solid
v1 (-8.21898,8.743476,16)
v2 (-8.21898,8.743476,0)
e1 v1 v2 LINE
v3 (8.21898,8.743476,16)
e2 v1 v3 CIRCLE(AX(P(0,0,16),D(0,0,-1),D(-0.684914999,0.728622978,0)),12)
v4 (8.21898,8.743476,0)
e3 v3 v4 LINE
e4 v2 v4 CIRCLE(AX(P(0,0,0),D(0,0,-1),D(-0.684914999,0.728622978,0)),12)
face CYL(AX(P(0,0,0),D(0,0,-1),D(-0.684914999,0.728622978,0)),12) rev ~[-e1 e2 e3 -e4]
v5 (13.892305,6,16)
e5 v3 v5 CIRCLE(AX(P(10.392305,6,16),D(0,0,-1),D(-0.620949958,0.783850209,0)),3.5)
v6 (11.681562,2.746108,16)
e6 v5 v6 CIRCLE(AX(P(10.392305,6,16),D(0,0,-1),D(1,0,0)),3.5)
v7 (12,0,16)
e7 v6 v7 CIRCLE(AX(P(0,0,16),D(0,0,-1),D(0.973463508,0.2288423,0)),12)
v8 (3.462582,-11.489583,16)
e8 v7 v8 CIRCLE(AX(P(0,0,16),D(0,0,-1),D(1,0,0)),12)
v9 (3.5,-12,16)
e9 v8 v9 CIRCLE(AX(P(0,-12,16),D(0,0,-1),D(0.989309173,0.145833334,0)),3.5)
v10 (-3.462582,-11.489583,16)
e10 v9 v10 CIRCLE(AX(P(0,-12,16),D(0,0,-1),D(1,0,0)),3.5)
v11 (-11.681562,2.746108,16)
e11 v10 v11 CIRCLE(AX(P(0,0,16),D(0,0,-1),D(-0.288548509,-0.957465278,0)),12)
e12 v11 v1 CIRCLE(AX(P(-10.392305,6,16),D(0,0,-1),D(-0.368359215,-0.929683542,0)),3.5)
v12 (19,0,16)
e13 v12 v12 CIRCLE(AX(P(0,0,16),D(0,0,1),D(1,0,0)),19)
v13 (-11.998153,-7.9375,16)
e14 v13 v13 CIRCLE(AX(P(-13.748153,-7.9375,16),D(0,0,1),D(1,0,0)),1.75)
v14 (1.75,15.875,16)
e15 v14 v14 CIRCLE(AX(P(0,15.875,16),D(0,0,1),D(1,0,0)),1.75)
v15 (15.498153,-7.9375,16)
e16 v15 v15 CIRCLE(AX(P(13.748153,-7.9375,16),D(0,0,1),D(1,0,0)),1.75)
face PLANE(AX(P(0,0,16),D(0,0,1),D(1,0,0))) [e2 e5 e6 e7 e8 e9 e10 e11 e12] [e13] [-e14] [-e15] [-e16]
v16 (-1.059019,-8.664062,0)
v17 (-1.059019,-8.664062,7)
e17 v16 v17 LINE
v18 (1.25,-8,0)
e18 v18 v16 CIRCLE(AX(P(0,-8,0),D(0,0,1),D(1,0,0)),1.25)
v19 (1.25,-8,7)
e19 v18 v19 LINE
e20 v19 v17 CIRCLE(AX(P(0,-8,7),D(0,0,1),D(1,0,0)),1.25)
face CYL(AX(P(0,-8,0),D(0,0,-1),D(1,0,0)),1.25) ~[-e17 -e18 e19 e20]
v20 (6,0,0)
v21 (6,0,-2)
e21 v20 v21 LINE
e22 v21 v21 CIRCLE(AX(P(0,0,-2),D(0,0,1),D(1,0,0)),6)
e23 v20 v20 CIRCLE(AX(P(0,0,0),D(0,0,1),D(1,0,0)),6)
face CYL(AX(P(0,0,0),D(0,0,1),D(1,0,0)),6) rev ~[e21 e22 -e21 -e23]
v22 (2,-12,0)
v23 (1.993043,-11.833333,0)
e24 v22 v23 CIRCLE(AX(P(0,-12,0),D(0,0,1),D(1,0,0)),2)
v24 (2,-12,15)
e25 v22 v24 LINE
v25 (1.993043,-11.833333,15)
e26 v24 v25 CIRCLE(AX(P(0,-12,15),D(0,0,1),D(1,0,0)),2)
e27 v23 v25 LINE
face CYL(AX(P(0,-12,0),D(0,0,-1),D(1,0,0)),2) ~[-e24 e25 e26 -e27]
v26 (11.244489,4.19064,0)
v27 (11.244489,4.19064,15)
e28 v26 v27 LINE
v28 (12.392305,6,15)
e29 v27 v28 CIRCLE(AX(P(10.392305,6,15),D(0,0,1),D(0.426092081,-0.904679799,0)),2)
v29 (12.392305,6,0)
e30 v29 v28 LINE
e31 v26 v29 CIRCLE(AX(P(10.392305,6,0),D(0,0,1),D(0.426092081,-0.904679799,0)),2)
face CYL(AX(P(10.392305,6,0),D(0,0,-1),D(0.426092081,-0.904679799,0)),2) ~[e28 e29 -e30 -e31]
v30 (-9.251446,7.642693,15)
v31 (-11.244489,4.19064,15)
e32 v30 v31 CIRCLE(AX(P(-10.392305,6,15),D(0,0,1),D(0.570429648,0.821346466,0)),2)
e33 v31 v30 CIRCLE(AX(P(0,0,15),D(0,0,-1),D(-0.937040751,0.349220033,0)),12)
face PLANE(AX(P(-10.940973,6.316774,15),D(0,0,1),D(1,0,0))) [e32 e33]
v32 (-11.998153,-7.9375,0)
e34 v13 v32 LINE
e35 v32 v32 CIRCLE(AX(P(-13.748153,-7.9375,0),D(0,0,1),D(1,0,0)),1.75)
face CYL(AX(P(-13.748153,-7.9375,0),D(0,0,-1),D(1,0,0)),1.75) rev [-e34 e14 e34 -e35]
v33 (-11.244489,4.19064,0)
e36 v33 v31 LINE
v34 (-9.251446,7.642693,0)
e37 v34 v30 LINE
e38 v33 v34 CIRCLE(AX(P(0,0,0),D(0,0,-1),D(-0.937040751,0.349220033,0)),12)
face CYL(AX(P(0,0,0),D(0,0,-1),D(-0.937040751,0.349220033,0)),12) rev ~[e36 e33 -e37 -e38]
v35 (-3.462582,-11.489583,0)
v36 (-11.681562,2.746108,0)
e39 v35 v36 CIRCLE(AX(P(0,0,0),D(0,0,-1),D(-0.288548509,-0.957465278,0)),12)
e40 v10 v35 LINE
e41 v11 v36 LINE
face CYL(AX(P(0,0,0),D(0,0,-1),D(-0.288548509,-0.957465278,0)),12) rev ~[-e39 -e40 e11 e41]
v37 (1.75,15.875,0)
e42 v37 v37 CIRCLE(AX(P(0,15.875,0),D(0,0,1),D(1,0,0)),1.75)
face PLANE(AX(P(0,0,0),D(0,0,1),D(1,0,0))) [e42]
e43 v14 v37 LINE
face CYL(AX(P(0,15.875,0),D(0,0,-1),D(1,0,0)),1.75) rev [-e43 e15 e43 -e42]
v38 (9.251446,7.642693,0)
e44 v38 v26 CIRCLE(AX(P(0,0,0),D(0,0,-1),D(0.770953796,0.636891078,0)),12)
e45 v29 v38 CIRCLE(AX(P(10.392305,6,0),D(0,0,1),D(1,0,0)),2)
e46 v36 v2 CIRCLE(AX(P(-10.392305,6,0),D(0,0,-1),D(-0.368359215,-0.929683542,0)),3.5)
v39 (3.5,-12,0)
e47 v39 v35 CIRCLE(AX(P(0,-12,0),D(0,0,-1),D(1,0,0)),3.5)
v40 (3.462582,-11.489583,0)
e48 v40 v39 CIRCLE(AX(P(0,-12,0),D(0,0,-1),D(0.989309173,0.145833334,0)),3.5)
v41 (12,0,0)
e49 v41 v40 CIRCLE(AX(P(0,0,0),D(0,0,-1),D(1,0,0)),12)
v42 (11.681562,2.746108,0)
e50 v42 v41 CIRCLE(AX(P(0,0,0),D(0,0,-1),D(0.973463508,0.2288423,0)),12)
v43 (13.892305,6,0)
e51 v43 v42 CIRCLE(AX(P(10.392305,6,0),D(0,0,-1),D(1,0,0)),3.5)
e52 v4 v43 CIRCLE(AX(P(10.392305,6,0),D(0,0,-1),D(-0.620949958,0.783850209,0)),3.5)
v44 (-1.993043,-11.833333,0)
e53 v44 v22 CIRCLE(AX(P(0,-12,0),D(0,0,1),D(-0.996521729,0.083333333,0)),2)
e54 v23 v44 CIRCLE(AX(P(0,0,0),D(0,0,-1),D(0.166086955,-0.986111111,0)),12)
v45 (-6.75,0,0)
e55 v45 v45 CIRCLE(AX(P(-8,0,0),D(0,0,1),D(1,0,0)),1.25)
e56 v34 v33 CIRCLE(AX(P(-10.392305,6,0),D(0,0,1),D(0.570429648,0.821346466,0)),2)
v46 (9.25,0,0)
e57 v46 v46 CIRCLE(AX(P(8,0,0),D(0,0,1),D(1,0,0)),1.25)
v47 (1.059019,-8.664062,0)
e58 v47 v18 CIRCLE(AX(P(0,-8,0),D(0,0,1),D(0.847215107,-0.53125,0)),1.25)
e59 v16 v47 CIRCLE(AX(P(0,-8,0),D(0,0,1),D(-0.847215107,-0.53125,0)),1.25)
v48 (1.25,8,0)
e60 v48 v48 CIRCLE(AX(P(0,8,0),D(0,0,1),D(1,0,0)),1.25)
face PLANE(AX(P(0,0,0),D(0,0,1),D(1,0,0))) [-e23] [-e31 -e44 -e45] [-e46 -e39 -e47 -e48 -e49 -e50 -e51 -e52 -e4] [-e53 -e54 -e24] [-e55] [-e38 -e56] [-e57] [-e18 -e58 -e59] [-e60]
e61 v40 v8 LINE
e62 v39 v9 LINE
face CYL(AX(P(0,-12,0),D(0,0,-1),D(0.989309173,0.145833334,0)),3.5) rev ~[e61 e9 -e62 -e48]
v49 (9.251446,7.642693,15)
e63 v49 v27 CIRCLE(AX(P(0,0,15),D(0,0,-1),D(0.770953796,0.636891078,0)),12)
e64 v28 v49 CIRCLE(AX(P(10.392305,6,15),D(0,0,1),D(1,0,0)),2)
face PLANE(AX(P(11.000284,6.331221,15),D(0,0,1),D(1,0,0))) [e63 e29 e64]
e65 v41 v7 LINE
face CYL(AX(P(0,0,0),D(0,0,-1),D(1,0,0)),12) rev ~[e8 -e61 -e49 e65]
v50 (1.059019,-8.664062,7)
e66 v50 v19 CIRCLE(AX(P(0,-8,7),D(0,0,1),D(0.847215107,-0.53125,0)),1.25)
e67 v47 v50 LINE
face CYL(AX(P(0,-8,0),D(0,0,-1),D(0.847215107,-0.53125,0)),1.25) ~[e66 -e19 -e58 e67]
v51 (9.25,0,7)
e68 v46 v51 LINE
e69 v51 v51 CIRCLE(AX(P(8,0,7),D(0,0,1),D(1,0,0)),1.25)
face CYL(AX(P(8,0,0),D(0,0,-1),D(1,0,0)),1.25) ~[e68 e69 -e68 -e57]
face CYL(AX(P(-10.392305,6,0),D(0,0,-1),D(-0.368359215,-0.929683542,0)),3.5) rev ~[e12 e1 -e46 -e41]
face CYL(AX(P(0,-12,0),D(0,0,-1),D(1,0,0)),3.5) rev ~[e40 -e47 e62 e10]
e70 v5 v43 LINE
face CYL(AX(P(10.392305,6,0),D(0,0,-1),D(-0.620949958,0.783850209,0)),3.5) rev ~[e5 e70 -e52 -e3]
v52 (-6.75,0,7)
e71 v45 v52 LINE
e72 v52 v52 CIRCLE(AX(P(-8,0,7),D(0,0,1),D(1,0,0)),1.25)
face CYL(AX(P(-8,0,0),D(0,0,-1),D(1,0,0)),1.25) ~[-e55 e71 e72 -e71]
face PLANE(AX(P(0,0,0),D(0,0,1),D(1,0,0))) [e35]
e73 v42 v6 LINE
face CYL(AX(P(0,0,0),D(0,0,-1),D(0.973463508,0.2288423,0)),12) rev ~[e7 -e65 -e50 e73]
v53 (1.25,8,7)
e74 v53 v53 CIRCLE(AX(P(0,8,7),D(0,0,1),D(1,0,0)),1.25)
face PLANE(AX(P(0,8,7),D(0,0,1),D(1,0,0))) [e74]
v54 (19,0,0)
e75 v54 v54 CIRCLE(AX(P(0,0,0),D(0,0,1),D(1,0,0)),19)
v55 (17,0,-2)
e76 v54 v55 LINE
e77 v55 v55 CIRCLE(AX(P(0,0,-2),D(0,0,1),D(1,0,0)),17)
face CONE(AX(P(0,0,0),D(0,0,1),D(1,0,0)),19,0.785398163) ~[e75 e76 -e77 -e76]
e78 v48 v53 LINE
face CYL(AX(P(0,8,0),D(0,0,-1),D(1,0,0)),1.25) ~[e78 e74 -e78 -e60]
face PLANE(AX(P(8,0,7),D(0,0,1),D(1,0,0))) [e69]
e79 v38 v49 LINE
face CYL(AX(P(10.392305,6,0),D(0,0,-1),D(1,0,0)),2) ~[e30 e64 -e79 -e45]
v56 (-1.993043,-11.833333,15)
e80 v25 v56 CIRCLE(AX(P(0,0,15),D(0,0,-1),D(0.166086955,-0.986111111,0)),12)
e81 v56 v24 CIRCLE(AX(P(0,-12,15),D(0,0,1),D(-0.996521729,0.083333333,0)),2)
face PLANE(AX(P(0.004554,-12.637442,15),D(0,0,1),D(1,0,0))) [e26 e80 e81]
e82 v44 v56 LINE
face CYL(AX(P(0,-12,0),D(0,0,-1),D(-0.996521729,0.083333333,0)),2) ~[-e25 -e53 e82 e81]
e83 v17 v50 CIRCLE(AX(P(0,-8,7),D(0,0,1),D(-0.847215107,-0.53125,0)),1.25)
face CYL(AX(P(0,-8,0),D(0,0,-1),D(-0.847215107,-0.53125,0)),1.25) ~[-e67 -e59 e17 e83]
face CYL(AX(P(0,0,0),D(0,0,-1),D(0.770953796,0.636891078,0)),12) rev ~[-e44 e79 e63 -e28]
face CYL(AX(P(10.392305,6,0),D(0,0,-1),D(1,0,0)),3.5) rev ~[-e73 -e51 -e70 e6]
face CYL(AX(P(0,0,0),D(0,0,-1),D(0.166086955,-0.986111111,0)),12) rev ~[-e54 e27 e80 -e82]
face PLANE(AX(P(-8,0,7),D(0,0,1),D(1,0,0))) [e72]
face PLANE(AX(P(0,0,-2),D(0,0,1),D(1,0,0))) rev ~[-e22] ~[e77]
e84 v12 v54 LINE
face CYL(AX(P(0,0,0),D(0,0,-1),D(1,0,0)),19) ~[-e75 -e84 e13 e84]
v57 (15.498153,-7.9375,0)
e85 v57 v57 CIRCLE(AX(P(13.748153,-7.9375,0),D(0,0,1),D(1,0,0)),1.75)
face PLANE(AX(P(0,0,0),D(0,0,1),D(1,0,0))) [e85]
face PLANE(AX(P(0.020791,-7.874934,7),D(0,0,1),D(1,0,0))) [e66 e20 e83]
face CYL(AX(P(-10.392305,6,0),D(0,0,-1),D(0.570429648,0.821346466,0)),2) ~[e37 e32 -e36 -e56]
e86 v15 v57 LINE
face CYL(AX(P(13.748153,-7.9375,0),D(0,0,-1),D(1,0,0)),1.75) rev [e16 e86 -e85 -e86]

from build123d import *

# Parameters (mm, degrees)
F0_R         = 19
F0_R_2       = 1.75
F1_DEPTH     = 16
F0_R_3       = 1.25
F0_R_4       = 6
F1_FACE_R    = 19
F1_FACE_R_2  = 1.75
F1_FACE1_R   = 19
F1_FACE1_R_2 = 1.75
F2_DEPTH     = 2
F3_DEPTH     = 7
F5_DEPTH     = 15


# Not quite as in the source:
# - a fillet or chamfer that OpenCascade refuses, or shapes differently, is made with other operations: its cross-section is extruded or revolved along the edge and cut away or added


with BuildPart() as f1:
    # F0 (on Top) → F1 (new body)
    with BuildSketch(Plane.XY):
        Circle(F0_R)
        with Locations((-13.7481532851, -7.9375)):
            Circle(F0_R_2, mode=Mode.SUBTRACT)
        with BuildLine():
            ThreePointArc((11.6815620975, 2.746107602), (11.9201246883, 1.3822544682), (12, 0))
            ThreePointArc((12, 0), (9.6320035623, -7.1571298281), (3.4625821039, -11.4895833333))
            ThreePointArc((3.4625821039, -11.4895833333), (3.4906329916, -11.7441068228), (3.5, -12))
            ThreePointArc((3.5, -12), (-0.2558931772, -15.4906329916), (-3.4625821039, -11.4895833333))
            ThreePointArc((-3.4625821039, -11.4895833333), (-10.3923048454, -6), (-11.6815620975, 2.746107602))
            ThreePointArc((-11.6815620975, 2.746107602), (-13.4233937587, 7.75), (-8.2189799936, 8.7434757314))
            ThreePointArc((-8.2189799936, 8.7434757314), (0, 12), (8.2189799936, 8.7434757314))
            ThreePointArc((8.2189799936, 8.7434757314), (11.9160113491, 9.1509234346), (13.8923048454, 6))
            ThreePointArc((13.8923048454, 6), (13.2873351028, 4.0330735121), (11.6815620975, 2.746107602))
        make_face(mode=Mode.SUBTRACT)
        with Locations((13.7481532851, -7.9375)):
            Circle(F0_R_2, mode=Mode.SUBTRACT)
        with Locations((0, 15.875)):
            Circle(F0_R_2, mode=Mode.SUBTRACT)
    extrude(amount=F1_DEPTH)

    # F0 (on Top) + F1_face (on face) + F1_face1 (on face) → F2 (join)
    with BuildSketch(Plane.XY):
        Circle(F0_R)
        with Locations((-13.7481532851, -7.9375)):
            Circle(F0_R_2, mode=Mode.SUBTRACT)
        with BuildLine():
            ThreePointArc((11.6815620975, 2.746107602), (11.9201246883, 1.3822544682), (12, 0))
            ThreePointArc((12, 0), (9.6320035623, -7.1571298281), (3.4625821039, -11.4895833333))
            ThreePointArc((3.4625821039, -11.4895833333), (3.4906329916, -11.7441068228), (3.5, -12))
            ThreePointArc((3.5, -12), (-0.2558931772, -15.4906329916), (-3.4625821039, -11.4895833333))
            ThreePointArc((-3.4625821039, -11.4895833333), (-10.3923048454, -6), (-11.6815620975, 2.746107602))
            ThreePointArc((-11.6815620975, 2.746107602), (-13.4233937587, 7.75), (-8.2189799936, 8.7434757314))
            ThreePointArc((-8.2189799936, 8.7434757314), (0, 12), (8.2189799936, 8.7434757314))
            ThreePointArc((8.2189799936, 8.7434757314), (11.9160113491, 9.1509234346), (13.8923048454, 6))
            ThreePointArc((13.8923048454, 6), (13.2873351028, 4.0330735121), (11.6815620975, 2.746107602))
        make_face(mode=Mode.SUBTRACT)
        with Locations((13.7481532851, -7.9375)):
            Circle(F0_R_2, mode=Mode.SUBTRACT)
        with Locations((0, 15.875)):
            Circle(F0_R_2, mode=Mode.SUBTRACT)
        with BuildLine():
            ThreePointArc((3.4625821039, -11.4895833333), (9.6320035623, -7.1571298281), (12, 0))
            ThreePointArc((12, 0), (11.9201246883, 1.3822544682), (11.6815620975, 2.746107602))
            ThreePointArc((11.6815620975, 2.746107602), (7.3612159322, 4.25), (8.2189799936, 8.7434757314))
            ThreePointArc((8.2189799936, 8.7434757314), (0, 12), (-8.2189799936, 8.7434757314))
            ThreePointArc((-8.2189799936, 8.7434757314), (-7.2413814108, 7.5237065037), (-6.8923048454, 6))
            ThreePointArc((-6.8923048454, 6), (-8.4253783575, 3.1049697426), (-11.6815620975, 2.746107602))
            ThreePointArc((-11.6815620975, 2.746107602), (-10.3923048454, -6), (-3.4625821039, -11.4895833333))
            ThreePointArc((-3.4625821039, -11.4895833333), (-2.6659165155, -9.732206109), (-1.0590188837, -8.6640625))
            ThreePointArc((-1.0590188837, -8.6640625), (-0.3454897939, -6.79869371), (1.25, -8))
            ThreePointArc((1.25, -8), (1.20130629, -8.3454897939), (1.0590188837, -8.6640625))
            ThreePointArc((1.0590188837, -8.6640625), (2.6659165155, -9.732206109), (3.4625821039, -11.4895833333))
        make_face()
        with Locations((-8, 0)):
            Circle(F0_R_3, mode=Mode.SUBTRACT)
        Circle(F0_R_4, mode=Mode.SUBTRACT)
        with Locations((8, 0)):
            Circle(F0_R_3, mode=Mode.SUBTRACT)
        with Locations((0, 8)):
            Circle(F0_R_3, mode=Mode.SUBTRACT)
        with BuildLine():
            ThreePointArc((11.2444890067, 4.1906404019), (11.4857574222, 3.4752519965), (11.6815620975, 2.746107602))
            ThreePointArc((11.6815620975, 2.746107602), (13.2873351028, 4.0330735121), (13.8923048454, 6))
            ThreePointArc((13.8923048454, 6), (11.9160113491, 9.1509234346), (8.2189799936, 8.7434757314))
            ThreePointArc((8.2189799936, 8.7434757314), (8.7525352246, 8.2093317111), (9.2514455495, 7.6426929314))
            ThreePointArc((9.2514455495, 7.6426929314), (11.3192032779, 7.7722469624), (12.3923048454, 6))
            ThreePointArc((12.3923048454, 6), (12.0811459159, 4.928638325), (11.2444890067, 4.1906404019))
        make_face()
        with BuildLine():
            ThreePointArc((3.5, -12), (3.4906329916, -11.7441068228), (3.4625821039, -11.4895833333))
            ThreePointArc((3.4625821039, -11.4895833333), (2.7332221976, -11.6845837075), (1.9930434572, -11.8333333333))
            ThreePointArc((1.9930434572, -11.8333333333), (1.9982601075, -11.916594108), (2, -12))
            ThreePointArc((2, -12), (-0.083405892, -13.9982601075), (-1.9930434572, -11.8333333333))
            ThreePointArc((-1.9930434572, -11.8333333333), (-2.7332221976, -11.6845837075), (-3.4625821039, -11.4895833333))
            ThreePointArc((-3.4625821039, -11.4895833333), (-0.2558931772, -15.4906329916), (3.5, -12))
        make_face()
        with BuildLine():
            ThreePointArc((-9.2514455495, 7.6426929314), (-8.7525352246, 8.2093317111), (-8.2189799936, 8.7434757314))
            ThreePointArc((-8.2189799936, 8.7434757314), (-13.4233937587, 7.75), (-11.6815620975, 2.746107602))
            ThreePointArc((-11.6815620975, 2.746107602), (-11.4857574222, 3.4752519965), (-11.2444890067, 4.1906404019))
            ThreePointArc((-11.2444890067, 4.1906404019), (-12.124355653, 7), (-9.2514455495, 7.6426929314))
        make_face()
        with BuildLine():
            ThreePointArc((8.2189799936, 8.7434757314), (7.3612159322, 4.25), (11.6815620975, 2.746107602))
            ThreePointArc((11.6815620975, 2.746107602), (11.4857574222, 3.4752519965), (11.2444890067, 4.1906404019))
            ThreePointArc((11.2444890067, 4.1906404019), (8.6602540378, 5), (9.2514455495, 7.6426929314))
            ThreePointArc((9.2514455495, 7.6426929314), (8.7525352246, 8.2093317111), (8.2189799936, 8.7434757314))
        make_face()
        with BuildLine():
            ThreePointArc((-6.8923048454, 6), (-7.2413814108, 7.5237065037), (-8.2189799936, 8.7434757314))
            ThreePointArc((-8.2189799936, 8.7434757314), (-8.7525352246, 8.2093317111), (-9.2514455495, 7.6426929314))
            ThreePointArc((-9.2514455495, 7.6426929314), (-8.620057883, 6.9268984325), (-8.3923048454, 6))
            ThreePointArc((-8.3923048454, 6), (-9.3209431704, 4.3111589295), (-11.2444890067, 4.1906404019))
            ThreePointArc((-11.2444890067, 4.1906404019), (-11.4857574222, 3.4752519965), (-11.6815620975, 2.746107602))
            ThreePointArc((-11.6815620975, 2.746107602), (-8.4253783575, 3.1049697426), (-6.8923048454, 6))
        make_face()
        with BuildLine():
            ThreePointArc((1.9930434572, -11.8333333333), (2.7332221976, -11.6845837075), (3.4625821039, -11.4895833333))
            ThreePointArc((3.4625821039, -11.4895833333), (2.6659165155, -9.732206109), (1.0590188837, -8.6640625))
            ThreePointArc((1.0590188837, -8.6640625), (0, -9.25), (-1.0590188837, -8.6640625))
            ThreePointArc((-1.0590188837, -8.6640625), (-2.6659165155, -9.732206109), (-3.4625821039, -11.4895833333))
            ThreePointArc((-3.4625821039, -11.4895833333), (-2.7332221976, -11.6845837075), (-1.9930434572, -11.8333333333))
            ThreePointArc((-1.9930434572, -11.8333333333), (0, -10), (1.9930434572, -11.8333333333))
        make_face()
        with Locations((-13.7481532851, -7.9375)):
            Circle(F0_R_2)
        with Locations((13.7481532851, -7.9375)):
            Circle(F0_R_2)
        with Locations((0, 15.875)):
            Circle(F0_R_2)
        with BuildLine():
            ThreePointArc((9.2514455495, 7.6426929314), (10.3923048454, 6), (11.2444890067, 4.1906404019))
            ThreePointArc((11.2444890067, 4.1906404019), (12.0811459159, 4.928638325), (12.3923048454, 6))
            ThreePointArc((12.3923048454, 6), (11.3192032779, 7.7722469624), (9.2514455495, 7.6426929314))
        make_face()
        with BuildLine():
            ThreePointArc((-11.2444890067, 4.1906404019), (-10.3923048454, 6), (-9.2514455495, 7.6426929314))
            ThreePointArc((-9.2514455495, 7.6426929314), (-12.124355653, 7), (-11.2444890067, 4.1906404019))
        make_face()
        with BuildLine():
            ThreePointArc((2, -12), (1.9982601075, -11.916594108), (1.9930434572, -11.8333333333))
            ThreePointArc((1.9930434572, -11.8333333333), (0, -12), (-1.9930434572, -11.8333333333))
            ThreePointArc((-1.9930434572, -11.8333333333), (-0.083405892, -13.9982601075), (2, -12))
        make_face()
        with BuildLine():
            ThreePointArc((9.2514455495, 7.6426929314), (8.6602540378, 5), (11.2444890067, 4.1906404019))
            ThreePointArc((11.2444890067, 4.1906404019), (10.3923048454, 6), (9.2514455495, 7.6426929314))
        make_face()
        with BuildLine():
            ThreePointArc((-8.3923048454, 6), (-8.620057883, 6.9268984325), (-9.2514455495, 7.6426929314))
            ThreePointArc((-9.2514455495, 7.6426929314), (-10.3923048454, 6), (-11.2444890067, 4.1906404019))
            ThreePointArc((-11.2444890067, 4.1906404019), (-9.3209431704, 4.3111589295), (-8.3923048454, 6))
        make_face()
        with BuildLine():
            ThreePointArc((-1.9930434572, -11.8333333333), (0, -12), (1.9930434572, -11.8333333333))
            ThreePointArc((1.9930434572, -11.8333333333), (0, -10), (-1.9930434572, -11.8333333333))
        make_face()
        with Locations((0, 8)):
            Circle(F0_R_3)
        with Locations((8, 0)):
            Circle(F0_R_3)
        with Locations((-8, 0)):
            Circle(F0_R_3)
        with BuildLine():
            ThreePointArc((-1.0590188837, -8.6640625), (0, -8.5), (1.0590188837, -8.6640625))
            ThreePointArc((1.0590188837, -8.6640625), (1.20130629, -8.3454897939), (1.25, -8))
            ThreePointArc((1.25, -8), (-0.3454897939, -6.79869371), (-1.0590188837, -8.6640625))
        make_face()
        with BuildLine():
            ThreePointArc((-1.0590188837, -8.6640625), (0, -9.25), (1.0590188837, -8.6640625))
            ThreePointArc((1.0590188837, -8.6640625), (0, -8.5), (-1.0590188837, -8.6640625))
        make_face()
    with BuildSketch(Plane(origin=(0, 0, 0), x_dir=(1, 0, 0), z_dir=(0, 0, -1))):
        Circle(F1_FACE_R)
        with Locations((-13.7481532851, 7.9375)):
            Circle(F1_FACE_R_2, mode=Mode.SUBTRACT)
        with BuildLine():
            ThreePointArc((-8.2189799936, -8.7434757314), (-13.4233937587, -7.75), (-11.6815620975, -2.746107602))
            ThreePointArc((-11.6815620975, -2.746107602), (-10.3923048454, 6), (-3.4625821039, 11.4895833333))
            ThreePointArc((-3.4625821039, 11.4895833333), (0, 15.5), (3.4625821039, 11.4895833333))
            ThreePointArc((3.4625821039, 11.4895833333), (10.3923048454, 6), (11.6815620975, -2.746107602))
            ThreePointArc((11.6815620975, -2.746107602), (13.4233937587, -7.75), (8.2189799936, -8.7434757314))
            ThreePointArc((8.2189799936, -8.7434757314), (0, -12), (-8.2189799936, -8.7434757314))
        make_face(mode=Mode.SUBTRACT)
        with Locations((13.7481532851, 7.9375)):
            Circle(F1_FACE_R_2, mode=Mode.SUBTRACT)
        with Locations((0, -15.875)):
            Circle(F1_FACE_R_2, mode=Mode.SUBTRACT)
    with BuildSketch(Plane.XY.offset(16)):
        Circle(F1_FACE1_R)
        with Locations((-13.7481532851, -7.9375)):
            Circle(F1_FACE1_R_2, mode=Mode.SUBTRACT)
        with BuildLine():
            ThreePointArc((-11.6815620975, 2.746107602), (-13.4233937587, 7.75), (-8.2189799936, 8.7434757314))
            ThreePointArc((-8.2189799936, 8.7434757314), (0, 12), (8.2189799936, 8.7434757314))
            ThreePointArc((8.2189799936, 8.7434757314), (13.4233937587, 7.75), (11.6815620975, 2.746107602))
            ThreePointArc((11.6815620975, 2.746107602), (10.3923048454, -6), (3.4625821039, -11.4895833333))
            ThreePointArc((3.4625821039, -11.4895833333), (0, -15.5), (-3.4625821039, -11.4895833333))
            ThreePointArc((-3.4625821039, -11.4895833333), (-10.3923048454, -6), (-11.6815620975, 2.746107602))
        make_face(mode=Mode.SUBTRACT)
        with Locations((13.7481532851, -7.9375)):
            Circle(F1_FACE1_R_2, mode=Mode.SUBTRACT)
        with Locations((0, 15.875)):
            Circle(F1_FACE1_R_2, mode=Mode.SUBTRACT)
    extrude(amount=-F2_DEPTH, dir=(0, 0, 1))

    # F0 (on Top) → F3 (join)
    with BuildSketch(Plane.XY):
        with Locations((-8, 0)):
            Circle(F0_R_3)
        with Locations((0, 8)):
            Circle(F0_R_3)
        with Locations((8, 0)):
            Circle(F0_R_3)
        with BuildLine():
            ThreePointArc((-1.0590188837, -8.6640625), (0, -8.5), (1.0590188837, -8.6640625))
            ThreePointArc((1.0590188837, -8.6640625), (1.20130629, -8.3454897939), (1.25, -8))
            ThreePointArc((1.25, -8), (-0.3454897939, -6.79869371), (-1.0590188837, -8.6640625))
        make_face()
        with BuildLine():
            ThreePointArc((-1.0590188837, -8.6640625), (0, -9.25), (1.0590188837, -8.6640625))
            ThreePointArc((1.0590188837, -8.6640625), (0, -8.5), (-1.0590188837, -8.6640625))
        make_face()
    extrude(amount=F3_DEPTH)

    # F4: chamfer of 2 on 1 edges, made by hand

    # F4_s1 → F4_t2 (revolve, cut)
    with BuildSketch(Plane.XZ):
        Polygon((19, 0), (17, -2), (19, -2), align=None)
    revolve(axis=Axis((0, 0, -2), (0, 0, 1)), mode=Mode.SUBTRACT)

    # F0 (on Top) → F5 (join)
    with BuildSketch(Plane.XY):
        with BuildLine():
            ThreePointArc((-11.2444890067, 4.1906404019), (-10.3923048454, 6), (-9.2514455495, 7.6426929314))
            ThreePointArc((-9.2514455495, 7.6426929314), (-12.124355653, 7), (-11.2444890067, 4.1906404019))
        make_face()
        with BuildLine():
            ThreePointArc((9.2514455495, 7.6426929314), (10.3923048454, 6), (11.2444890067, 4.1906404019))
            ThreePointArc((11.2444890067, 4.1906404019), (12.0811459159, 4.928638325), (12.3923048454, 6))
            ThreePointArc((12.3923048454, 6), (11.3192032779, 7.7722469624), (9.2514455495, 7.6426929314))
        make_face()
        with BuildLine():
            ThreePointArc((2, -12), (1.9982601075, -11.916594108), (1.9930434572, -11.8333333333))
            ThreePointArc((1.9930434572, -11.8333333333), (0, -12), (-1.9930434572, -11.8333333333))
            ThreePointArc((-1.9930434572, -11.8333333333), (-0.083405892, -13.9982601075), (2, -12))
        make_face()
    extrude(amount=F5_DEPTH)


solid = f1.part
